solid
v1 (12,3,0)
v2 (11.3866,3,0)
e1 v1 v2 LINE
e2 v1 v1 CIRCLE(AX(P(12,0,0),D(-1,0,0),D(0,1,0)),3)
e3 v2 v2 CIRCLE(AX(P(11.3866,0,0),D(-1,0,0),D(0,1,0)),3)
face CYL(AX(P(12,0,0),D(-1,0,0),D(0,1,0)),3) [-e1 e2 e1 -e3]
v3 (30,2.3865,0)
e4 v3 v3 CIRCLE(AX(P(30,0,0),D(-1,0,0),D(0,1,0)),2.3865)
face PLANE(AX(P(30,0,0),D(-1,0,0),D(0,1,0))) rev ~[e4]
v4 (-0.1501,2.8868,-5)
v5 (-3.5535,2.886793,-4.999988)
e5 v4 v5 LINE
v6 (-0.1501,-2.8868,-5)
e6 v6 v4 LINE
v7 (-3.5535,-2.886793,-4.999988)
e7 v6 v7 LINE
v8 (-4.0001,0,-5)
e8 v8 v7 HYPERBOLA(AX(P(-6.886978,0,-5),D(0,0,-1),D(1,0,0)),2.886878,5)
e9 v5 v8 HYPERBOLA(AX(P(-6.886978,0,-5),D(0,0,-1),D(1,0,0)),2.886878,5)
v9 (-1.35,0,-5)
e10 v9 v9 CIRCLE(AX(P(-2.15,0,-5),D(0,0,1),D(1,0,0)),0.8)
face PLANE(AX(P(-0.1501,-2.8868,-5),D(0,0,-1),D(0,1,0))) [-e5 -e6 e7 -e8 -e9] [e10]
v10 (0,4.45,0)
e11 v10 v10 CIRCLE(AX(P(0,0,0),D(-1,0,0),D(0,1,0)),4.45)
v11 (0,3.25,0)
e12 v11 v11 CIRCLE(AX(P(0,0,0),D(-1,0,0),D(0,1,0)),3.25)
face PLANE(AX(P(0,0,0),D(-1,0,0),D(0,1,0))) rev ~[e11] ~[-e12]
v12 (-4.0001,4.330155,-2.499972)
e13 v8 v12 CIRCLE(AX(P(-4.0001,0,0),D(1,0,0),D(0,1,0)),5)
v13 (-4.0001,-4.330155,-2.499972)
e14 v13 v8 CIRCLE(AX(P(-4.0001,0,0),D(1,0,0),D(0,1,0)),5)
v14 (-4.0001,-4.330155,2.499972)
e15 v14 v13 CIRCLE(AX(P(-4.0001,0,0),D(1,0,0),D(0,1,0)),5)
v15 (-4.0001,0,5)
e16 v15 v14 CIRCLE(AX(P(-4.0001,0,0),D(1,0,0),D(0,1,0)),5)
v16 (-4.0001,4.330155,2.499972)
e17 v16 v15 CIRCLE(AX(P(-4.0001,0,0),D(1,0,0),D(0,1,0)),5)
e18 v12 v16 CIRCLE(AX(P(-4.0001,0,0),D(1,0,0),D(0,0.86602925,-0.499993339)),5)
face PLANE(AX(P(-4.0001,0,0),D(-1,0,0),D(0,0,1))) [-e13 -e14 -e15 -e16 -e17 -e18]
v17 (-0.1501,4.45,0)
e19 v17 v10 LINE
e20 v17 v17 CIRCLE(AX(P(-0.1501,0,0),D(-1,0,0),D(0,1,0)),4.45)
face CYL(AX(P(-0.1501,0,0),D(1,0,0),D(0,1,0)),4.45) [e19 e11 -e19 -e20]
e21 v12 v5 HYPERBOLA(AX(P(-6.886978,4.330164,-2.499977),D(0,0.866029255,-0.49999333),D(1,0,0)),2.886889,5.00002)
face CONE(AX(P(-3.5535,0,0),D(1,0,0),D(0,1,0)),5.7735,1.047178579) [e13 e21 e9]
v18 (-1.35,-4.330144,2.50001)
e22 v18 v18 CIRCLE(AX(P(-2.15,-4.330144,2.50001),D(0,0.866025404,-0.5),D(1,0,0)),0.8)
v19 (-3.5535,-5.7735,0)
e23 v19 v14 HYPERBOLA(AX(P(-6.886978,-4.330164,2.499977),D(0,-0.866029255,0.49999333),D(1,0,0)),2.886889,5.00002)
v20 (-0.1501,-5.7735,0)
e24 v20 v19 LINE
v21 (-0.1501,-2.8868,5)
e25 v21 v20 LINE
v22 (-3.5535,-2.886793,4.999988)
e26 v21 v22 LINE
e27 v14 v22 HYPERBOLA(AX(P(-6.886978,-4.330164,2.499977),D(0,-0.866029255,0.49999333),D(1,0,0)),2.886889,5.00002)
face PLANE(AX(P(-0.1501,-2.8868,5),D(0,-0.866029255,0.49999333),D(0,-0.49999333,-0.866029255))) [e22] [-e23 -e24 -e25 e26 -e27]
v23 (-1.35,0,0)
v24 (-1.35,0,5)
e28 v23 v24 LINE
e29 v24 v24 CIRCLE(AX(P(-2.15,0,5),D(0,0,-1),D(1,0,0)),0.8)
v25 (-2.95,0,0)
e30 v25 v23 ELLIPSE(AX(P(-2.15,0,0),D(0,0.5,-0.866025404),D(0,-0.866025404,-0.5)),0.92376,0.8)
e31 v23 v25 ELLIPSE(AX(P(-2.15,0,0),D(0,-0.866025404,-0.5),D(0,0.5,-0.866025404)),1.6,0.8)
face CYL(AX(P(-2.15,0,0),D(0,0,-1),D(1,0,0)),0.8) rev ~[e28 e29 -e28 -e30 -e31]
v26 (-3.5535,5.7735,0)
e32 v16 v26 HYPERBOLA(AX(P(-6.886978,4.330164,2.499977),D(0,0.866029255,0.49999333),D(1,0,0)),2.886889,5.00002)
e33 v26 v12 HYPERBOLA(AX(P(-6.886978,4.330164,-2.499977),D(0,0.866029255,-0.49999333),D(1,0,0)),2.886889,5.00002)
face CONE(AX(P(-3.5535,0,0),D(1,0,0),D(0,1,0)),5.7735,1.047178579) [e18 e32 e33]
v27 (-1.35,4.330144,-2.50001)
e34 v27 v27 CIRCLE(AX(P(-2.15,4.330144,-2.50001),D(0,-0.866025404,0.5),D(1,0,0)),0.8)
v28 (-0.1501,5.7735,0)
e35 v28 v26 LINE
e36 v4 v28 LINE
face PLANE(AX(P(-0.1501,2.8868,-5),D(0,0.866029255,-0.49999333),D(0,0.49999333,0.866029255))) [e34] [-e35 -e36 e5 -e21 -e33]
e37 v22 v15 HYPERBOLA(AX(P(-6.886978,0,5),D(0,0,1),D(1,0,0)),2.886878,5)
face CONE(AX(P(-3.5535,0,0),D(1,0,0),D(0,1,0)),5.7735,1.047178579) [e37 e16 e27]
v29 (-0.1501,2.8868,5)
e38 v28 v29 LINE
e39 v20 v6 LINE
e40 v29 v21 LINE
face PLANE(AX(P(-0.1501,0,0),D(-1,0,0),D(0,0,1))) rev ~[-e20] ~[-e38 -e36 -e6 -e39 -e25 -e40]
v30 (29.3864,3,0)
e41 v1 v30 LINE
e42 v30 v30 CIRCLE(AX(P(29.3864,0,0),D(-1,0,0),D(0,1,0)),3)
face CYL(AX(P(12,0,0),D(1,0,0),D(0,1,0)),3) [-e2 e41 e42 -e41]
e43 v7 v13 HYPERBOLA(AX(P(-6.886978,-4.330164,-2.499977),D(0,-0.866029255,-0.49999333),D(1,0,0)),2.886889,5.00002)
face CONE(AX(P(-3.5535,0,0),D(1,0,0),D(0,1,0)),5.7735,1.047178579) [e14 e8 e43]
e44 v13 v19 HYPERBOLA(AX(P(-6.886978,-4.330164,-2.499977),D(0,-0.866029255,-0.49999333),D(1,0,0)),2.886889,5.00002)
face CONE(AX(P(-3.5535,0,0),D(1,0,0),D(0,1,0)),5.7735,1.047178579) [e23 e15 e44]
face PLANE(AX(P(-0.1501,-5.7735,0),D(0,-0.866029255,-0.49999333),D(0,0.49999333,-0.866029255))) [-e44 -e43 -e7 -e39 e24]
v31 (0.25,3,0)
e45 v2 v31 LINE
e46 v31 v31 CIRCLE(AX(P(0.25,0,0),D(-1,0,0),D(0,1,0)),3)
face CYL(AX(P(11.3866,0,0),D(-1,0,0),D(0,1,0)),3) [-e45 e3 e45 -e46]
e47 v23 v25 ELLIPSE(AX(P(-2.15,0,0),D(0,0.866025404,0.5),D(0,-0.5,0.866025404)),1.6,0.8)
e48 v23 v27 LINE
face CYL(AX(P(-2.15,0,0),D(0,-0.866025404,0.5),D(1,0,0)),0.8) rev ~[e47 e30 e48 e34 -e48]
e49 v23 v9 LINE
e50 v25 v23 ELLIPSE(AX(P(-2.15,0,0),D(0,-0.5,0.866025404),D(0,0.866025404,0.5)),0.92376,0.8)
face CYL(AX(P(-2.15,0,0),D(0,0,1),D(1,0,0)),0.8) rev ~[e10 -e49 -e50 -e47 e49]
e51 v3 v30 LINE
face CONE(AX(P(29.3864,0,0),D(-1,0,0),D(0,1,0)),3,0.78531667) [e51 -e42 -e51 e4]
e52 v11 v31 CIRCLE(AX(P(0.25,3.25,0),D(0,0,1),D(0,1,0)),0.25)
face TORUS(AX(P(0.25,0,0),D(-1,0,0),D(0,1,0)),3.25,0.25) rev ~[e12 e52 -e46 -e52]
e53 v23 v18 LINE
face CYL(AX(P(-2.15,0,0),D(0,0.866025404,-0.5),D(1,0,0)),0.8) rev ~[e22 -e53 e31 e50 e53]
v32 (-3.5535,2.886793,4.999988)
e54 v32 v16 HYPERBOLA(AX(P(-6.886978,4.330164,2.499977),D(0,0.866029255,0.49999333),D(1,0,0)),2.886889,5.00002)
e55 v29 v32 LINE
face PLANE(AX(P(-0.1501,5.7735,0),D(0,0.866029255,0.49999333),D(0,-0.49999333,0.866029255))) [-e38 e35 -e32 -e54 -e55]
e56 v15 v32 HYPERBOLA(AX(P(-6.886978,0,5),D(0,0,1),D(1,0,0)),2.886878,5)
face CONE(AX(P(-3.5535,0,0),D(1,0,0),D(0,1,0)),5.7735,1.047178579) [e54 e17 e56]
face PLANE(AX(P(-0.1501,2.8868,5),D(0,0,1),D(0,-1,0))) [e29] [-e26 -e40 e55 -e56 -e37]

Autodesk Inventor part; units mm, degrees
ref_plane "YZ Plane" through (0, 0, 0) normal (1, 0, 0) x (0, 1, 0)
ref_plane "XZ Plane" through (0, 0, 0) normal (0, 1, 0) x (-1, 0, 0)
sketch "草图1" plane through (0, 0, 0) normal (0, 0, 1) x (1, 0, 0)
  line L0 (0, 4.45) -> (0, 3)
  line L1 (12, 3) -> (30, 3)
  line L2 (30, 3) -> (30, 0)
  line L3 (30, 0) -> (-0.1501, 0)
  line L4 (-6.1801, 0) -> (36.03, 0) projected
  line L5 (-0.1501, 0) -> (-0.1501, 4.45)
  line L6 (-0.1501, 4.45) -> (0, 4.45)
  line L7 (12, 3) -> (11.3866, 3)
  line L8 (11.3866, 3) -> (0, 3)
  line L9 (0, -0.89) -> (0, 5.34) projected
  line L10 (11.3866, 3) -> (11.3866, 0) construction
  line L11 (12, 3) -> (12, 0) construction
  dimension "d0" = 30
  dimension "d1" = 18
  dimension "d2" = 6
  dimension "d9" = 0.1501
  dimension "d10" = 8.9
  dimension "d13" = 0.6135
  dimension "d14" = 6
revolve "轴承体" add sketch "草图1" angle 360 about axis through (30, 0, 0) along (-1, 0, 0)
sketch "草图2" plane through (-0.1501, 0, 0) normal (-1, 0, 0) x (0, 0, 1)
  line L0 (0, 5.7735) -> (5, 2.8868)
  line L1 (5, 2.8868) -> (5, -2.8868)
  line L2 (5, -2.8868) -> (0, -5.7735)
  line L3 (0, -5.7735) -> (-5, -2.8868)
  line L4 (-5, -2.8868) -> (-5, 2.8868)
  line L5 (-5, 2.8868) -> (0, 5.7735)
  point P0 (0, 0)
  point P1 (0, 0)
  dimension "d11" = 10
extrude "头" add sketch "草图2" along normal blind 3.85
sketch "草图3" plane through (0, 0, 0) normal (0, 0, 1) x (1, 0, 0)
  line L0 (-4.0001, 5) -> (-4.0001, 5.7735)
  line L1 (-4.0001, 5.7735) -> (-3.5535, 5.7735)
  line L2 (-3.5535, 5.7735) -> (-4.0001, 5)
  line L3 (-4.7701, 0) -> (0.6199, 0) projected
  line L4 (-0.1501, 5.7735) -> (-4.0001, 5.7735) projected
  line L5 (-4.0001, 2.8868) -> (-4.0001, 5.7735) projected
  dimension "d5" = 30
  dimension "d25" = 10
revolve "倒角1" cut sketch "草图3" angle 360 about axis through (-10, 0, 0) along (1, 0, 0)
sketch "草图4" plane through (0, 0, 0) normal (0, 0, 1) x (1, 0, 0)
  circle A0 centre (-2.15, 0) radius 0.8
  line L0 (-3.54, 0) -> (0.59, 0) projected
  point P0 (0, 0)
  dimension "d18" = 1.6
  dimension "d19" = 2.15
extrude "孔" cut sketch "草图4" along normal through all both and the other way through all
pattern_circular "IDS_ARRAYHOLE" count 2 over 60 about axis through (-10, 0, 0) along (1, 0, 0) of "孔"
fillet "圆角1" radius 0.25 1 edges at (0, -3, 0)
thread "螺纹" size "M6x1" designation "M6" class "6g" standard "GB Metric profile" length 18
chamfer "倒角2" distance 0.6135 distance2 0.6136 1 edges at (30, -3, 0) measured on face at (30, -0.5525, 1.8157)
ref_plane "Work Plane1" through (16, 0, 0) normal (0, 0, -1) x (1, 0, 0)
equation "\"d0\" = NLG"
equation "\"d1\" = GEL"
equation "\"d2\" = GD"
equation "\"d10\" = SD2"
equation "\"d13\" = GAL"
equation "\"d14\" = BDM"
equation "\"d11\" = SW"
equation "\"d3\" = KOH - SD"
equation "\"d5\" = ANG1"
equation "\"d25\" = SW0"
equation "\"d18\" = BOR"
equation "\"d19\" = DIST + SD"
equation "\"d24\" = RR"
equation "\"d15\" = GEL"
equation "\"d6\" = -0.5 * SPD + 0.5 * GD"
equation "\"NLG\" = 30"
equation "\"GD\" = NND"
equation "\"BDM\" = NND"
equation "\"KOH\" = 4"
equation "\"GEL\" = 18"
equation "\"SW\" = 10"
equation "\"SW0\" = SW"
equation "\"SPD\" = NND - 1.2269 * PTC"
equation "\"SD2\" = SDH"
equation "\"SD\" = WFT"
equation "\"ANG1\" = 30deg"
equation "\"GAL\" = 0.61345 * PTC"
equation "\"GUL\" = 0.61345 * PTC"
equation "\"DIST\" = 2"
equation "\"BOR\" = 1.6"
equation "\"RR\" = 0.25"
equation "\"WFT\" = 0.15"
equation "\"FAWI\" = 45deg"
equation "\"PTC\" = 1"
equation "\"THREADDIA\" = 6"
equation "\"E0\" = 1.155 * SW"
equation "\"TOA\" = 30deg"
equation "\"NND\" = 6"
equation "\"GD1\" = THREADDIA - 1.2269 * PTC"
equation "\"SDH\" = 8.9"
properties part number "螺栓 GB 32.1 M6 x 30" material "钢，软"
